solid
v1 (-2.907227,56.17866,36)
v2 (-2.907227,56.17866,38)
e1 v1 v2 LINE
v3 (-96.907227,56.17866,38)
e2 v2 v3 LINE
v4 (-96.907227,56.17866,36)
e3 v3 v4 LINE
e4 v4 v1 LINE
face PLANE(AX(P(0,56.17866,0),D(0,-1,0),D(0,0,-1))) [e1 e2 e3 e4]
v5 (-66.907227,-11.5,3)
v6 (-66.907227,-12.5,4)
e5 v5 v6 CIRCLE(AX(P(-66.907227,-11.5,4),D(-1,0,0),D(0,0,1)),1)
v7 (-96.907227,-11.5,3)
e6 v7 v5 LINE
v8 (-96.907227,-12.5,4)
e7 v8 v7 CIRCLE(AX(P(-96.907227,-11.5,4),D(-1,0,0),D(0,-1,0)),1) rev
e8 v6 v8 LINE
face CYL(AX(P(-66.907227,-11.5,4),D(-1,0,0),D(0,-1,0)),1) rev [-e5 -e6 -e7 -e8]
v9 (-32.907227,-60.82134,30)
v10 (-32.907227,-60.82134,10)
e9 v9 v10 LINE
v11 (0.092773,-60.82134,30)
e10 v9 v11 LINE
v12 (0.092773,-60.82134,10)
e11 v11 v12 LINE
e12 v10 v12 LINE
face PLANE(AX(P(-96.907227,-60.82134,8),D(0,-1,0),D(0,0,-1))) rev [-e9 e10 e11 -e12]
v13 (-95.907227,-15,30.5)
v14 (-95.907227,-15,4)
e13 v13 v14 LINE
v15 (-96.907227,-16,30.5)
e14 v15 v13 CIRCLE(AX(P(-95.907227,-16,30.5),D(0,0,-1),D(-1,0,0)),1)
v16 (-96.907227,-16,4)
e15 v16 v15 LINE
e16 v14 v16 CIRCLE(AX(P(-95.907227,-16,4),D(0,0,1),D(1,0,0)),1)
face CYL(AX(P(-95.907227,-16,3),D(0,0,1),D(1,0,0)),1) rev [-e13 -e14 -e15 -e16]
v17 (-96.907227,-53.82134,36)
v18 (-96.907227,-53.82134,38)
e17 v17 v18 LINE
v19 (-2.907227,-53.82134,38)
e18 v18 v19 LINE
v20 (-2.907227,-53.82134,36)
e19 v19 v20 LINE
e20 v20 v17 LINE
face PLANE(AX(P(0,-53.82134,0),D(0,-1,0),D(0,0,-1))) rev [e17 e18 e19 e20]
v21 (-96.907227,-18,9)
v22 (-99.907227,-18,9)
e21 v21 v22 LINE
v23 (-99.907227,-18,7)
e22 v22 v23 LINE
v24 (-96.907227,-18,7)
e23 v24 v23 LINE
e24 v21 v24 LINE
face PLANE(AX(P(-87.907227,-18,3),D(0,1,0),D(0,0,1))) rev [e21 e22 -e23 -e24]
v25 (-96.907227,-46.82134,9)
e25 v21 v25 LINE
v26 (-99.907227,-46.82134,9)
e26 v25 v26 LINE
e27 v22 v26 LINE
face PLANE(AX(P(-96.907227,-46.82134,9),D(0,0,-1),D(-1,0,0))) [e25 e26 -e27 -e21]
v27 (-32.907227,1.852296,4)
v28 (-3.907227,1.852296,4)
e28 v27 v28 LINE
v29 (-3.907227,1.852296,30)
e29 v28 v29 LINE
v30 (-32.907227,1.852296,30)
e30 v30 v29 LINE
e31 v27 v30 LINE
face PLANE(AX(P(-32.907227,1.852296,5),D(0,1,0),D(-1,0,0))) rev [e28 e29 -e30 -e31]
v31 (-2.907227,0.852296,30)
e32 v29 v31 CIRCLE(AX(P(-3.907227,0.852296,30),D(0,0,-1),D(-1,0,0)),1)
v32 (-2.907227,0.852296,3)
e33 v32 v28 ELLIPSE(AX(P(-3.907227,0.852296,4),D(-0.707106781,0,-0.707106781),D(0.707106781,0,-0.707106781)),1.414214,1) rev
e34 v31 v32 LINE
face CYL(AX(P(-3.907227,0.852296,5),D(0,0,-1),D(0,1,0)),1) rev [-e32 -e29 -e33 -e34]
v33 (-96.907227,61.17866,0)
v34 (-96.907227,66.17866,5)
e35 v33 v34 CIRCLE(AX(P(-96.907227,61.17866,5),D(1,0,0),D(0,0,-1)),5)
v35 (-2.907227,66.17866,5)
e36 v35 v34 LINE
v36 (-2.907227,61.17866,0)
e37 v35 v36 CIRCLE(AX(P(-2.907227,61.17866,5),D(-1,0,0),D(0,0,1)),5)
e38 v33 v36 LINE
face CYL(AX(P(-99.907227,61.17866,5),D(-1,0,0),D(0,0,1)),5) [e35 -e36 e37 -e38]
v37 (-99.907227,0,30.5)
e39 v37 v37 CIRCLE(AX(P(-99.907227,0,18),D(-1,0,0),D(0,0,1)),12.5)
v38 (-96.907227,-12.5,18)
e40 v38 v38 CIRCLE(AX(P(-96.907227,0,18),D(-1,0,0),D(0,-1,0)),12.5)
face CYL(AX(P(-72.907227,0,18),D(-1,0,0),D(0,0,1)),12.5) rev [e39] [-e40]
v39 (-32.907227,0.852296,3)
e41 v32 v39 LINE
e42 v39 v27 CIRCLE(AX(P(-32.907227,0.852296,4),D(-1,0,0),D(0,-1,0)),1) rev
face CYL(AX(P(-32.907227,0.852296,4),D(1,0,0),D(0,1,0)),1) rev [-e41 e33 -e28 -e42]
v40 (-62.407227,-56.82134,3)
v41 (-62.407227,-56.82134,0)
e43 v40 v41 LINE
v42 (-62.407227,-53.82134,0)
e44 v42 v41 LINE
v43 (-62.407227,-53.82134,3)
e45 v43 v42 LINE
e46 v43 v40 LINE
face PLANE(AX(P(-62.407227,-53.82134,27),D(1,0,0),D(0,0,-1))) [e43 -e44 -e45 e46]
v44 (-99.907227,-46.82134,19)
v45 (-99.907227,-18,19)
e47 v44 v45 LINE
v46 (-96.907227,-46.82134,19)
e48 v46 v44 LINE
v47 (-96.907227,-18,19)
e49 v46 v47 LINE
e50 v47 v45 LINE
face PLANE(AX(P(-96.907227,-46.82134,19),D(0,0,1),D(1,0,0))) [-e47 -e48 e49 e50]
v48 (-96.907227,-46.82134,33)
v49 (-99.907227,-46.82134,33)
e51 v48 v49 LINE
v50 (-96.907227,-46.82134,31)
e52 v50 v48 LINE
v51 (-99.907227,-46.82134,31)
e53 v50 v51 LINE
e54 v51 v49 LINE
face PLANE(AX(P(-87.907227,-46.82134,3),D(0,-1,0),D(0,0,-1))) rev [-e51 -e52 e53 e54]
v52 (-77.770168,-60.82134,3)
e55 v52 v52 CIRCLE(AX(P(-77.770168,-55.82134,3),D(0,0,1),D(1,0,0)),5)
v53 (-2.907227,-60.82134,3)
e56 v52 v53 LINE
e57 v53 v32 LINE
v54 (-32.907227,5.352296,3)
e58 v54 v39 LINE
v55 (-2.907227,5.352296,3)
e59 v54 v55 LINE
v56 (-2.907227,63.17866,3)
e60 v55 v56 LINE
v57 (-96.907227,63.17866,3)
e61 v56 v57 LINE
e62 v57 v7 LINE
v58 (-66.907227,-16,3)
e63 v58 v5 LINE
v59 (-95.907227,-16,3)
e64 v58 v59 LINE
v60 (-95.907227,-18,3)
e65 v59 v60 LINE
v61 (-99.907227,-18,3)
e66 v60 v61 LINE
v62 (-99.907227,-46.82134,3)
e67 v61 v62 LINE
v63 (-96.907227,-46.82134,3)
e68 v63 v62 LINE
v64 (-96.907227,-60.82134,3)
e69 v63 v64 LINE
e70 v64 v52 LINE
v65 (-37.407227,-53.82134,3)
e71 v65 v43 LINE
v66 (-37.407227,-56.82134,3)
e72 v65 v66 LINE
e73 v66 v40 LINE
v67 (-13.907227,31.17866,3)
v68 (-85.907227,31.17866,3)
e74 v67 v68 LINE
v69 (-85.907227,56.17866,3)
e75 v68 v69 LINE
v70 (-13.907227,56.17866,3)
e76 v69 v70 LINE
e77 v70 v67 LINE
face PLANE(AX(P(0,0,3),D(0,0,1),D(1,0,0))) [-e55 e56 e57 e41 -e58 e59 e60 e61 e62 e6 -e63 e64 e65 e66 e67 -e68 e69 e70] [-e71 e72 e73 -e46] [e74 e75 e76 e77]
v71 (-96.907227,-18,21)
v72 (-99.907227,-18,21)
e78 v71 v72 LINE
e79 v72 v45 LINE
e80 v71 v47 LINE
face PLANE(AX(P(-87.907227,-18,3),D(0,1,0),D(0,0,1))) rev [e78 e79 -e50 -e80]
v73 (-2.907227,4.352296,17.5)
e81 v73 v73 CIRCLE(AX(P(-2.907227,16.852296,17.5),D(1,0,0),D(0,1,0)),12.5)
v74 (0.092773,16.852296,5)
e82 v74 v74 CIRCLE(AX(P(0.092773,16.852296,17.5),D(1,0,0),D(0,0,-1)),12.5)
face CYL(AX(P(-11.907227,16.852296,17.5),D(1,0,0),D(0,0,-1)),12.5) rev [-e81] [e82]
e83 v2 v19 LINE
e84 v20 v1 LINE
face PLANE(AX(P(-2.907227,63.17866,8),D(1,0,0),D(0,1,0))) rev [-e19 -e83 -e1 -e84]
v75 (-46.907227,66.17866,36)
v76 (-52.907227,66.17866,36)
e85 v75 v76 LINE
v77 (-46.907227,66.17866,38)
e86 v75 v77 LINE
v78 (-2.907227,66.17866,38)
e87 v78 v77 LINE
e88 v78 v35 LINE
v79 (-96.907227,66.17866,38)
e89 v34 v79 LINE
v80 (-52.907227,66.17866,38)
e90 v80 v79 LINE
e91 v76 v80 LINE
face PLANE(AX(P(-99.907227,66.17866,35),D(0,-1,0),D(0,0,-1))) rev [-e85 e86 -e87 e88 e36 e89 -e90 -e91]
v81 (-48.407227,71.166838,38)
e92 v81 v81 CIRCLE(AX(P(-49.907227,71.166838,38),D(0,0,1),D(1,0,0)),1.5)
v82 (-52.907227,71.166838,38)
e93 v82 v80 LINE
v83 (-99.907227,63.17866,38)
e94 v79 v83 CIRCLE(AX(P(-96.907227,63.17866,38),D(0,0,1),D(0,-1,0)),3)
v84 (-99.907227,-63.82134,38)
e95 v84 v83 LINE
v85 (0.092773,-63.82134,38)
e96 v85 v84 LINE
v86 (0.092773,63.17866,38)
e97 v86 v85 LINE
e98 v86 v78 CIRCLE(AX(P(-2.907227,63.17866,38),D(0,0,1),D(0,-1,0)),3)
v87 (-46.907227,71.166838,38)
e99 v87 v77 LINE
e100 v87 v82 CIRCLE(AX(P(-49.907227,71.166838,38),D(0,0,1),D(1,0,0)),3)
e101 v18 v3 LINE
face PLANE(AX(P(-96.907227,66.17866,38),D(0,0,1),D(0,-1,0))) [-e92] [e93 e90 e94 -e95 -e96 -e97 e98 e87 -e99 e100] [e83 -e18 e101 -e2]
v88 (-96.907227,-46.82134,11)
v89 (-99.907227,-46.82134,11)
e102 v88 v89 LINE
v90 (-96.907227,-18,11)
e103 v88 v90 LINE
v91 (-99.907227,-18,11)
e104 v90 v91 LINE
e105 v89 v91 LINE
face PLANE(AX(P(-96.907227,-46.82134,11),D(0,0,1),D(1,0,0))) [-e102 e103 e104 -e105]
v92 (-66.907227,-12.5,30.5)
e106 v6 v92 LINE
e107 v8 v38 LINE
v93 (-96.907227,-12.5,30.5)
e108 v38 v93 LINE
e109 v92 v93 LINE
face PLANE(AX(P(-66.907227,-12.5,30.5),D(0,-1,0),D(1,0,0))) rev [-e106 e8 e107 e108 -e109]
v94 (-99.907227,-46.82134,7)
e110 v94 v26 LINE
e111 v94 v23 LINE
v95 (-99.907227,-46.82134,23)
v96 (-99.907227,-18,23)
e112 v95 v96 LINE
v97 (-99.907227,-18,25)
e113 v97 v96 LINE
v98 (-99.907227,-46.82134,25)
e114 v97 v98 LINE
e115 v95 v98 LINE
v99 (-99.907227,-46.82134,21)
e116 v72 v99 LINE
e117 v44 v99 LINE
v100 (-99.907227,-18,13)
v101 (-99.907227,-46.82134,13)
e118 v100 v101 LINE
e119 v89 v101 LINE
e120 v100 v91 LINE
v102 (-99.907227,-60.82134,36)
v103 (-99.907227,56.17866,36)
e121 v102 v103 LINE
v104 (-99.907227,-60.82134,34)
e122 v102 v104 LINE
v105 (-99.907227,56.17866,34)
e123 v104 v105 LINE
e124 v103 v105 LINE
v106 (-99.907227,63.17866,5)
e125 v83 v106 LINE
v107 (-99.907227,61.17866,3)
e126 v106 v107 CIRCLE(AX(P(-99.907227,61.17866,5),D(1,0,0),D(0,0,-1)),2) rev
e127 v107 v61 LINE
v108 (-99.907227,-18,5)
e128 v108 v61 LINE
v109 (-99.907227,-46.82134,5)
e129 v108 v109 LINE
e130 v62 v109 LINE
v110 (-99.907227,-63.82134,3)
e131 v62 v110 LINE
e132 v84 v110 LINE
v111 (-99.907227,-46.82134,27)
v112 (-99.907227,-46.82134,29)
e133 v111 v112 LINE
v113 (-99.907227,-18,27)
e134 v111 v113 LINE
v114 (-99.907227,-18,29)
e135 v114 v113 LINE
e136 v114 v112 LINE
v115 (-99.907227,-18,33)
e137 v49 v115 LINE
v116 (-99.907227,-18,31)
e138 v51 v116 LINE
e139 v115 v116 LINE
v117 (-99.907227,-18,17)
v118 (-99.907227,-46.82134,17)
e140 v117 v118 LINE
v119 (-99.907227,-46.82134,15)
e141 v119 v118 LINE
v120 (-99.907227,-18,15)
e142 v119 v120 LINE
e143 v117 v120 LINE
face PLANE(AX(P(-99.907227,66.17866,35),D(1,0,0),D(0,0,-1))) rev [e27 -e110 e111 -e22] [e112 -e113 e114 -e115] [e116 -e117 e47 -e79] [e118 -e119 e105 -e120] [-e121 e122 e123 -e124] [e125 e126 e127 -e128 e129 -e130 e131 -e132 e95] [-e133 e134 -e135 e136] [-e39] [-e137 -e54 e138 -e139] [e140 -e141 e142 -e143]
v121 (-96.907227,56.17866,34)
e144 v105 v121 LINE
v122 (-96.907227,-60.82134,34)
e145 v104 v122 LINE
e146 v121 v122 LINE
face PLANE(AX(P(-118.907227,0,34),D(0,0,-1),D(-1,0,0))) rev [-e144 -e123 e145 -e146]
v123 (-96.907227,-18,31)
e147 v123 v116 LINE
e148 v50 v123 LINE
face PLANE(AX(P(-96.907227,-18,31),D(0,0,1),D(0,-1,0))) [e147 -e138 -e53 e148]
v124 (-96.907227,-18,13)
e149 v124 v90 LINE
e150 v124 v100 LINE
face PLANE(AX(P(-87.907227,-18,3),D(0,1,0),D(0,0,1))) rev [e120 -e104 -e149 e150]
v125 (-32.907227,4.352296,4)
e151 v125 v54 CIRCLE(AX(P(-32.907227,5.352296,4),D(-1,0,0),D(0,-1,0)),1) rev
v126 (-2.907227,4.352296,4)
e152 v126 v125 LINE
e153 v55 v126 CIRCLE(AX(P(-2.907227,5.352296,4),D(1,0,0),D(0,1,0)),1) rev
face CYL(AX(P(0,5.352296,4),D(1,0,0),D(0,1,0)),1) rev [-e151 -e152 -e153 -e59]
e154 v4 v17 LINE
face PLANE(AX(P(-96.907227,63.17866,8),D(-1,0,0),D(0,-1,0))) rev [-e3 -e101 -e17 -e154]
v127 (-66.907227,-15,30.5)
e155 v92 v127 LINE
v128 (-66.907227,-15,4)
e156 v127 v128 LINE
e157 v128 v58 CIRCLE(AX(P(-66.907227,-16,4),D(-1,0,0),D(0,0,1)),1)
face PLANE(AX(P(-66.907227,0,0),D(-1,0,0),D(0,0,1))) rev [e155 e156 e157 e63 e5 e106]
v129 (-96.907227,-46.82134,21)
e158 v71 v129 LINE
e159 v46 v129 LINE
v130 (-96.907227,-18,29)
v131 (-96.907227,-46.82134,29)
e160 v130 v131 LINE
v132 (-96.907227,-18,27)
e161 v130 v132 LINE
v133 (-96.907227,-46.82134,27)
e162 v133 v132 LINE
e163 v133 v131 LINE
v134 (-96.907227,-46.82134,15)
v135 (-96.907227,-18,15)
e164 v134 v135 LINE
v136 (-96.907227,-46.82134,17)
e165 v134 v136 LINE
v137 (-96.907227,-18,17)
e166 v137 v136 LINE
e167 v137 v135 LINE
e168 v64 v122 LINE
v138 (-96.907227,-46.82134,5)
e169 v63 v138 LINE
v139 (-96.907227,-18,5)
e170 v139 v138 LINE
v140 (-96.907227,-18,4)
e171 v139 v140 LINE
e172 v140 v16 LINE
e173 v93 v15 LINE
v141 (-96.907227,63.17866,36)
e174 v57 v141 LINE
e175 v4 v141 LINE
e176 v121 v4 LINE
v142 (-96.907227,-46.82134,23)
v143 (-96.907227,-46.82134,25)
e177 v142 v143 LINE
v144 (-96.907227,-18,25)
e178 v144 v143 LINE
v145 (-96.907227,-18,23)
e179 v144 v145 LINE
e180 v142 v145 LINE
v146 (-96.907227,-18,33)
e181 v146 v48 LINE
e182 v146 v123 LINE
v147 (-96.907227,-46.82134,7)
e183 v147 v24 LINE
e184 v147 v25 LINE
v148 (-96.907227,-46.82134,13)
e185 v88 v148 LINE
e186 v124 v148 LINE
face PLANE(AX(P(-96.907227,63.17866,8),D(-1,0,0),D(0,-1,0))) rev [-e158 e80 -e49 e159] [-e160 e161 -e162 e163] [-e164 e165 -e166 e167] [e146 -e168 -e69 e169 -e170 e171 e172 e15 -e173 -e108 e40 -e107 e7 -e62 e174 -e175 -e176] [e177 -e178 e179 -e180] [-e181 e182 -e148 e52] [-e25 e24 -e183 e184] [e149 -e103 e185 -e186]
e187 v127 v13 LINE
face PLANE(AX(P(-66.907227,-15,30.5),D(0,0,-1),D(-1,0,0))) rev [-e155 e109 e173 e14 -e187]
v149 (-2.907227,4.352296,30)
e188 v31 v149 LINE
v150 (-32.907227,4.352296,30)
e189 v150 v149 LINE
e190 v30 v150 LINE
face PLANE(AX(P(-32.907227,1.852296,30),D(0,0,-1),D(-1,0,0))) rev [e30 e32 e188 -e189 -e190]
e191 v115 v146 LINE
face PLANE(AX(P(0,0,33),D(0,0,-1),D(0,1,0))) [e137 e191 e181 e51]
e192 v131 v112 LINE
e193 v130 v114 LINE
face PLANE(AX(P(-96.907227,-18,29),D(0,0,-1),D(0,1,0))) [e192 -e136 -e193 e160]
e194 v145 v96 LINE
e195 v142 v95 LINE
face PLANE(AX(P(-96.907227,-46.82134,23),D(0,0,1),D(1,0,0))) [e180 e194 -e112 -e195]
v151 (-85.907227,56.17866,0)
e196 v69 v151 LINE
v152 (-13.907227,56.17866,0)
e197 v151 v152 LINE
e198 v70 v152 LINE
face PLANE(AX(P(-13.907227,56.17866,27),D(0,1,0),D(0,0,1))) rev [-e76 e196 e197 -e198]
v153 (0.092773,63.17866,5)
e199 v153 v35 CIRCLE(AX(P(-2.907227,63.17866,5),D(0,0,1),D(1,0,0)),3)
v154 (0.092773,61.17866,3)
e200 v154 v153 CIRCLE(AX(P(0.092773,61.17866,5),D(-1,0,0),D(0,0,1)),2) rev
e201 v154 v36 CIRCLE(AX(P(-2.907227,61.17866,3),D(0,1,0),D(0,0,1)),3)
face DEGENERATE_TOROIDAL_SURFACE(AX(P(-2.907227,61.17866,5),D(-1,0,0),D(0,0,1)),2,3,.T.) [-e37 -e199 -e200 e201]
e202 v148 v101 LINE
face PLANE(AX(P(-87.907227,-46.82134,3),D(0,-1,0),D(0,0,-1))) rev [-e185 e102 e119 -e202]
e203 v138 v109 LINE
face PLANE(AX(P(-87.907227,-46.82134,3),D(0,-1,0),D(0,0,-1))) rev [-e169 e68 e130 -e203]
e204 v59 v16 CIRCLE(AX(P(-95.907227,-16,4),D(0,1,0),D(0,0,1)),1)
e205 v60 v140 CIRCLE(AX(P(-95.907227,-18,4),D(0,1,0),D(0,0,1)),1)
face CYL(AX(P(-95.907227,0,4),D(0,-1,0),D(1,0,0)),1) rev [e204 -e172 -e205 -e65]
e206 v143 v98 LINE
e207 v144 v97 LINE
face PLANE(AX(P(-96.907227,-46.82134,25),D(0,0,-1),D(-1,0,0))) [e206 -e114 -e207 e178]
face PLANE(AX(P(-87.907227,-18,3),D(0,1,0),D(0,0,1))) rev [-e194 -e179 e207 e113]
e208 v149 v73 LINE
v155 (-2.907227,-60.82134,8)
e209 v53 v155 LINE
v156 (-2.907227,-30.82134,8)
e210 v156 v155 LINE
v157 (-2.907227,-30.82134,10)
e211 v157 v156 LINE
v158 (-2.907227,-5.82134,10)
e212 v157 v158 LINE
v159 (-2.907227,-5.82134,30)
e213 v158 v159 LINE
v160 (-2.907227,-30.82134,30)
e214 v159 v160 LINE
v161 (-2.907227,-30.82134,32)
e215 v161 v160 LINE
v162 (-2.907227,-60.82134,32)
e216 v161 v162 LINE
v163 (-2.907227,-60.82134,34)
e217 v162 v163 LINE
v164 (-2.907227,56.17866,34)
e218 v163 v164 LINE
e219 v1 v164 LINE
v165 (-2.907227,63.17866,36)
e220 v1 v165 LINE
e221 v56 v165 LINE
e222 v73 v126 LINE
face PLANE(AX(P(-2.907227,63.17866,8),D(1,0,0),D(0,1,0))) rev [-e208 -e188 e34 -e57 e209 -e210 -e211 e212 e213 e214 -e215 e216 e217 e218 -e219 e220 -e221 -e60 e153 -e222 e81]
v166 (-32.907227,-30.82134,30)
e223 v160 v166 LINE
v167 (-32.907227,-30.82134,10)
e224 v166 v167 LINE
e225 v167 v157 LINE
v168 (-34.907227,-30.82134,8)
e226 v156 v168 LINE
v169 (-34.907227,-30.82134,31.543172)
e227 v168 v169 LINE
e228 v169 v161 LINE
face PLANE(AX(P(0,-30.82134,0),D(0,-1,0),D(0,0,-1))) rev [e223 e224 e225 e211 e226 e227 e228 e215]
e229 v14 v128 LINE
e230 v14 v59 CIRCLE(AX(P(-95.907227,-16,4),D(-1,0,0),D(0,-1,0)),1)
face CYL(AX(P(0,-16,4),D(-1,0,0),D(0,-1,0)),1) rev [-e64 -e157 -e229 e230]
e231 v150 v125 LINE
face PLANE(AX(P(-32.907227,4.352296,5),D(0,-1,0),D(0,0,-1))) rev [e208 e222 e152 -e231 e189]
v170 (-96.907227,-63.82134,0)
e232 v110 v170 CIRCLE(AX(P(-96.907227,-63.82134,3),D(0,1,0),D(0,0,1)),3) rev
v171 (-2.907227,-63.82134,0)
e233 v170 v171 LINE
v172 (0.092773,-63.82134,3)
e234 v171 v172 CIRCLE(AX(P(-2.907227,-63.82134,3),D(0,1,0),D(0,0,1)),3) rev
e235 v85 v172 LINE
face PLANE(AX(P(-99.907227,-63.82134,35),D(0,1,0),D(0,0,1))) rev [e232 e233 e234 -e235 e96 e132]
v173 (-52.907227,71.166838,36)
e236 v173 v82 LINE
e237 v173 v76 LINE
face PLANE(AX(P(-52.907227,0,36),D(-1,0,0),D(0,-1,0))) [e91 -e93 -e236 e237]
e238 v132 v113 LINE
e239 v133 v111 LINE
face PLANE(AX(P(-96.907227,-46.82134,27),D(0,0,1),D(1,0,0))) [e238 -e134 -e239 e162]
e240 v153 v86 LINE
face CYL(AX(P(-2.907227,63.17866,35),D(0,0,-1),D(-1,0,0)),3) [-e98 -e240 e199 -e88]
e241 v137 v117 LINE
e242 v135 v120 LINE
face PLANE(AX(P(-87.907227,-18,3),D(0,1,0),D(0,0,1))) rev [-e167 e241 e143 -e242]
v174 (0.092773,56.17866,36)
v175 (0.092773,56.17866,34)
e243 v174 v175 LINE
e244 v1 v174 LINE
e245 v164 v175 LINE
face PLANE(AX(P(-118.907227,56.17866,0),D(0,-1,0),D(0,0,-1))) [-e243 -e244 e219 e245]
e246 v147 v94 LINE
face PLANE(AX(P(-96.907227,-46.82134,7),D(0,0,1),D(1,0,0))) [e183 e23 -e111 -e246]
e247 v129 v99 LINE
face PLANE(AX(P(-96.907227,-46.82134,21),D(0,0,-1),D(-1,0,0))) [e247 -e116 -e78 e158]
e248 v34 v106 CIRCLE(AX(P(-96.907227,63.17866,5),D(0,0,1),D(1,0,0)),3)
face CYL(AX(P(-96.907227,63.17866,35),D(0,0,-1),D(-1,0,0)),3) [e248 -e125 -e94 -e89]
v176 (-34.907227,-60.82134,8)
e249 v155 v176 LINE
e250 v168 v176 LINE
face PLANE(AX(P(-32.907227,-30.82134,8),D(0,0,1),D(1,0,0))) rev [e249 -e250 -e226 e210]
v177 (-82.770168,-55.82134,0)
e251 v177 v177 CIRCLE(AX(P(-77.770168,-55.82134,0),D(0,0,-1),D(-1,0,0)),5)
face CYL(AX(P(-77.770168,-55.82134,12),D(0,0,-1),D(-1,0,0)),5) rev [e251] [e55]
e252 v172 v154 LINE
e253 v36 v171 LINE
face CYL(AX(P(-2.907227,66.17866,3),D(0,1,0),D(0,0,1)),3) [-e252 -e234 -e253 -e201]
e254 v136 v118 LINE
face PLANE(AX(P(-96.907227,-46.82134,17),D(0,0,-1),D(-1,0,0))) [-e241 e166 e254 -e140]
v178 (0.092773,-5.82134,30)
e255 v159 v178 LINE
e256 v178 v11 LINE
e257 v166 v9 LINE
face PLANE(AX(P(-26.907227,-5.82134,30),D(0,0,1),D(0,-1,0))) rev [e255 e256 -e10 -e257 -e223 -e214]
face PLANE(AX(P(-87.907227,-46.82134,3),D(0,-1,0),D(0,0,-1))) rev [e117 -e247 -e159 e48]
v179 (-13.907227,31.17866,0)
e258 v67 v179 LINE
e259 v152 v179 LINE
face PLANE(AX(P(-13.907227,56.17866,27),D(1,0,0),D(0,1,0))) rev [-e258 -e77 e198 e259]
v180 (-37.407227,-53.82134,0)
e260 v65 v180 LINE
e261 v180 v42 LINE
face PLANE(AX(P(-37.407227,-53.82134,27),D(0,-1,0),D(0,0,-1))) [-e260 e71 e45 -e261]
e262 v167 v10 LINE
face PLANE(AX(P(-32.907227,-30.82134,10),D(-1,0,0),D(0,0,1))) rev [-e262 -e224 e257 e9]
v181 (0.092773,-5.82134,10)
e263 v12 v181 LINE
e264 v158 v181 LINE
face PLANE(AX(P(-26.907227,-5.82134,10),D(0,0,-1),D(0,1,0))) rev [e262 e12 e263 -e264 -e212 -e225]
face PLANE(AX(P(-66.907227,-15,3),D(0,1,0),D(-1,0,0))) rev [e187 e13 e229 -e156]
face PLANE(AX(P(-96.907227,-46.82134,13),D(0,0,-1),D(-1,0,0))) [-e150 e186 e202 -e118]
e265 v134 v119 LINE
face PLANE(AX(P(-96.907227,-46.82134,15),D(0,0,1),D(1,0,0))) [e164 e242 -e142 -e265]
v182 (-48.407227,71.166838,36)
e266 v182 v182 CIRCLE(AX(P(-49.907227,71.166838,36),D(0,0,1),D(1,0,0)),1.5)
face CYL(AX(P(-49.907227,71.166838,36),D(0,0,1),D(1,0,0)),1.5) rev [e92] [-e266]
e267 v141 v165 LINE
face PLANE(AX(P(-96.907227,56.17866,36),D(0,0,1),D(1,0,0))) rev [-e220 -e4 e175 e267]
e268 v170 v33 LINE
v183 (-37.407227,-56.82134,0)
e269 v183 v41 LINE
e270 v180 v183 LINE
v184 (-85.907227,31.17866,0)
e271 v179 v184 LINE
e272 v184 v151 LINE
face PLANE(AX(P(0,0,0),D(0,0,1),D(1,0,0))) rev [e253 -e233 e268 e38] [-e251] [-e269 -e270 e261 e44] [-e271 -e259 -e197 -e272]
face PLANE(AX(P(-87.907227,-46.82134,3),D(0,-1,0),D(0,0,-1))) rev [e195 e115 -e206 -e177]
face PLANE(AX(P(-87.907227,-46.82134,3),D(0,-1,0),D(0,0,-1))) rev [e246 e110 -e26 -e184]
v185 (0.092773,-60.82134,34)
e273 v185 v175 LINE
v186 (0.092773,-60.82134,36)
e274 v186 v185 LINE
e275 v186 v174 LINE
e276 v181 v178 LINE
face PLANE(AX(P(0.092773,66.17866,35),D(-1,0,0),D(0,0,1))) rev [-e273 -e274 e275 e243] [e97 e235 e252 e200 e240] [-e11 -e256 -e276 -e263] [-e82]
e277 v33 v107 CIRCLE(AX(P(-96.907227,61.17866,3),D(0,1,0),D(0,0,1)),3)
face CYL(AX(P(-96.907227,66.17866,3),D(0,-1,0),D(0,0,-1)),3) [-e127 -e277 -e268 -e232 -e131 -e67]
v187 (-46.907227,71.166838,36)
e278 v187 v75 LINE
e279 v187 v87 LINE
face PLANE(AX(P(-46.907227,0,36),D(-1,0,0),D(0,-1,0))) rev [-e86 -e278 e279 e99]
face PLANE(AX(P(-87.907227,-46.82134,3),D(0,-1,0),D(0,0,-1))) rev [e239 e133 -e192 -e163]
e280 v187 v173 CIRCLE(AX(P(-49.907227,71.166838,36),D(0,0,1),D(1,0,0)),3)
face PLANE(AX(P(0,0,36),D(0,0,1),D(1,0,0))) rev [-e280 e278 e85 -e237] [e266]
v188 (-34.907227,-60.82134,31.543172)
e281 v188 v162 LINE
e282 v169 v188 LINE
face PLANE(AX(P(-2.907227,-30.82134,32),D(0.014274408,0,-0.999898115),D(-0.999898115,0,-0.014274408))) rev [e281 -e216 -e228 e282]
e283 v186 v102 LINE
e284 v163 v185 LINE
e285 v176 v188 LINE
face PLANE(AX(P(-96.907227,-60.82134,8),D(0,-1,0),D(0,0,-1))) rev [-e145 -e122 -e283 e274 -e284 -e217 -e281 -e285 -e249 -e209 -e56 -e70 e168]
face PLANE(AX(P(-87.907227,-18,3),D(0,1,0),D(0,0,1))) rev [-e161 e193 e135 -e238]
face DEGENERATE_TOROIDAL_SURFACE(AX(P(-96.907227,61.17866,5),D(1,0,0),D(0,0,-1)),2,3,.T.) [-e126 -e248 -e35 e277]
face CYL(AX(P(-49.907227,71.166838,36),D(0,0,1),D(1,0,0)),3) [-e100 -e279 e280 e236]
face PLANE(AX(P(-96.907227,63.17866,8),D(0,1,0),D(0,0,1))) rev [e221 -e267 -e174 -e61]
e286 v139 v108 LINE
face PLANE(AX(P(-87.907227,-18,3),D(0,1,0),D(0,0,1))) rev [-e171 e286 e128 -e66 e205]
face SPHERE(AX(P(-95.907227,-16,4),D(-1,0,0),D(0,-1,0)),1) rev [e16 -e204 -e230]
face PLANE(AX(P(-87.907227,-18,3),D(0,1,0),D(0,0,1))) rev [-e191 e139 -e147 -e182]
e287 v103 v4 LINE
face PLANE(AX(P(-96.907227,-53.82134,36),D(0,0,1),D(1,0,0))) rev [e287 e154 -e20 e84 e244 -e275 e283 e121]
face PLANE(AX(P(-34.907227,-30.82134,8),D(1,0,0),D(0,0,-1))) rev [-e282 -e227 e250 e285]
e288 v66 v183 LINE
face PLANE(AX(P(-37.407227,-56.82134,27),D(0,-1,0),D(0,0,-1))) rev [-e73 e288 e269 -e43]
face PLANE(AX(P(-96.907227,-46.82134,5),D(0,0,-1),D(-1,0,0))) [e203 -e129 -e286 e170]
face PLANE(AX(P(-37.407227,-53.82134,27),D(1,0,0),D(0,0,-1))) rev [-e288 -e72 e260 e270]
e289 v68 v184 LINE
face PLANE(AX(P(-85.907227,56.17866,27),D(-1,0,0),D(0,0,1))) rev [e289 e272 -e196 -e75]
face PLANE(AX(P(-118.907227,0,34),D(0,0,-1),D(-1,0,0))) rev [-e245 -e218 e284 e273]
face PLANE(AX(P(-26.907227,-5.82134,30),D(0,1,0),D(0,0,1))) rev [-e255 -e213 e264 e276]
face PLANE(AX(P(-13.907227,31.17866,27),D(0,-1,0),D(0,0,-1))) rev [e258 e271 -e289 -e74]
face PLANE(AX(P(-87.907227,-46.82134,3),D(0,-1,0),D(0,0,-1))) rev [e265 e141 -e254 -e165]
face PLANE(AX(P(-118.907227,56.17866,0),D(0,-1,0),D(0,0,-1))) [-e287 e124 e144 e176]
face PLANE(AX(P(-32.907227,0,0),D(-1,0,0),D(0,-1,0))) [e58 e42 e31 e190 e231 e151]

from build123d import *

# Parameters (mm, degrees)
IZIM1_W                      = 100
IZIM1_H                      = 130
Y_KSEKLIK_EKSTR_ZYON1_DEPTH  = 35
IZIM2_W                      = 94
IZIM2_H                      = 124
KES_EKSTR_ZYON1_DEPTH        = 27
IZIM3_W                      = 72
IZIM3_H                      = 25
KES_EKSTR_ZYON2_DEPTH        = 27
IZIM4_W                      = 25
IZIM4_H                      = 3
KES_EKSTR_ZYON3_DEPTH        = 27
IZIM7_W                      = 20
IZIM7_H                      = 55
KES_EKSTR_ZYON5_DEPTH        = 27
IZIM8_R                      = 12.5
KES_EKSTR_ZYON7_DEPTH        = 27
IZIM9_R                      = 12.5
KES_EKSTR_ZYON8_DEPTH        = 27
IZIM12_W                     = 94
IZIM12_H                     = 124
KES_EKSTR_ZYON9_DEPTH        = 5
IZIM13_W                     = 28.453191741
IZIM13_H                     = 38.236186197
Y_KSEKLIK_EKSTR_ZYON2_DEPTH  = 3
IZIM14_R                     = 12.5
KES_EKSTR_ZYON10_DEPTH       = 12
IZIM15_R                     = 5
KES_EKSTR_ZYON12_DEPTH       = 12
IZIM16_W                     = 29
IZIM16_H                     = 28.82133995
KES_EKSTR_ZYON13_DEPTH       = 12
IZIM17_W                     = 2
IZIM17_H                     = 28.82133995
Y_KSEKLIK_EKSTR_ZYON3_DEPTH  = 3
IZIM18_W                     = 3
IZIM18_H                     = 28.82133995
KES_EKSTR_ZYON14_DEPTH       = 1
IZIM20_W                     = 3
IZIM20_H                     = 130
Y_KSEKLIK_EKSTR_ZYON4_DEPTH  = 3
IZIM21_W                     = 3
IZIM21_H                     = 130
Y_KSEKLIK_EKSTR_ZYON5_DEPTH  = 3
IZIM22_W                     = 94
IZIM22_H                     = 3
Y_KSEKLIK_EKSTR_ZYON6_DEPTH  = 3
IZIM23_W                     = 94
IZIM23_H                     = 3
Y_KSEKLIK_EKSTR_ZYON8_DEPTH  = 3
IZIM24_W                     = 94
IZIM24_H                     = 2
Y_KSEKLIK_EKSTR_ZYON9_DEPTH  = 7
IZIM25_W                     = 94
IZIM25_H                     = 2
Y_KSEKLIK_EKSTR_ZYON10_DEPTH = 7
IZIM28_W                     = 2
IZIM28_H                     = 117
KES_EKSTR_ZYON16_DEPTH       = 119
Y_KSEKLIK_EKSTR_ZYON13_DEPTH = 2
Y_KSEKLIK_EKSTR_ZYON14_DEPTH = 30
Y_KSEKLIK_EKSTR_ZYON16_DEPTH = 30
IZIM33_W                     = 27.5
IZIM33_H                     = 2.5
Y_KSEKLIK_EKSTR_ZYON17_DEPTH = 30
RADYUS2_R                    = 1
RADYUS3_R                    = 1
RADYUS4_R                    = 5
RADYUS5_R                    = 3
RADYUS6_R                    = 3
RADYUS7_R                    = 1
RADYUS8_R                    = 1
RADYUS9_R                    = 1
RADYUS12_R                   = 1


# Some blends are built 0.0001 mm under size
with BuildPart() as part:
    # Çizim1 → Yükseklik-Ekstrüzyon1 (new body)
    with BuildSketch(Plane.XY):
        with Locations((-49.907227327, 1.17866005)):
            Rectangle(IZIM1_W, IZIM1_H)
    extrude(amount=Y_KSEKLIK_EKSTR_ZYON1_DEPTH)

    # Çizim2 → Kes-Ekstrüzyon1 (cut)
    with BuildSketch(Plane.XY.offset(35)):
        with Locations((-49.907227327, 1.17866005)):
            Rectangle(IZIM2_W, IZIM2_H)
    extrude(amount=-KES_EKSTR_ZYON1_DEPTH, mode=Mode.SUBTRACT)

    # Çizim3 → Kes-Ekstrüzyon2 (cut)
    with BuildSketch(Plane(origin=(0, 0, 0), x_dir=(-1, 0, 0), z_dir=(0, 0, -1))):
        with Locations((49.907227327, 43.67866005)):
            Rectangle(IZIM3_W, IZIM3_H)
    extrude(amount=-KES_EKSTR_ZYON2_DEPTH, mode=Mode.SUBTRACT)

    # Çizim4 → Kes-Ekstrüzyon3 (cut)
    with BuildSketch(Plane(origin=(0, 0, 0), x_dir=(-1, 0, 0), z_dir=(0, 0, -1))):
        with Locations((49.907227327, -55.32133995)):
            Rectangle(IZIM4_W, IZIM4_H)
    extrude(amount=-KES_EKSTR_ZYON3_DEPTH, mode=Mode.SUBTRACT)

    # Çizim7 → Kes-Ekstrüzyon5 (cut)
    with BuildSketch(Plane(origin=(0.092772673, 0, 0), x_dir=(0, 0, -1), z_dir=(1, 0, 0))):
        with Locations((-20, -33.32133995)):
            Rectangle(IZIM7_W, IZIM7_H)
    extrude(amount=-KES_EKSTR_ZYON5_DEPTH, mode=Mode.SUBTRACT)

    # Çizim8 → Kes-Ekstrüzyon7 (cut)
    with BuildSketch(Plane.ZY.offset(99.907227327)):
        with Locations((18, 0)):
            Circle(IZIM8_R)
    extrude(amount=-KES_EKSTR_ZYON7_DEPTH, mode=Mode.SUBTRACT)

    # Çizim9 → Kes-Ekstrüzyon8 (cut)
    with BuildSketch(Plane(origin=(0.092772673, 0, 0), x_dir=(0, 0, -1), z_dir=(1, 0, 0))):
        with Locations((-21.5, 19.418739017)):
            Circle(IZIM9_R)
    extrude(amount=-KES_EKSTR_ZYON8_DEPTH, mode=Mode.SUBTRACT)

    # Çizim12 → Kes-Ekstrüzyon9 (cut)
    with BuildSketch(Plane.XY.offset(8)):
        with Locations((-49.907227327, 1.17866005)):
            Rectangle(IZIM12_W, IZIM12_H)
    extrude(amount=-KES_EKSTR_ZYON9_DEPTH, mode=Mode.SUBTRACT)

    # Çizim13 → Yükseklik-Ekstrüzyon2 (add)
    with BuildSketch(Plane(origin=(0.092772673, 0, 0), x_dir=(0, 0, -1), z_dir=(1, 0, 0))):
        with Locations((-20.77340413, 20.296753148)):
            Rectangle(IZIM13_W, IZIM13_H)
    extrude(amount=-Y_KSEKLIK_EKSTR_ZYON2_DEPTH)

    # Çizim14 → Kes-Ekstrüzyon10 (cut)
    with BuildSketch(Plane(origin=(0.092772673, 0, 0), x_dir=(0, 0, -1), z_dir=(1, 0, 0))):
        with Locations((-17.5, 16.852295745)):
            Circle(IZIM14_R)
    extrude(amount=-KES_EKSTR_ZYON10_DEPTH, mode=Mode.SUBTRACT)

    # Çizim15 → Kes-Ekstrüzyon12 (cut)
    with BuildSketch(Plane(origin=(0, 0, 0), x_dir=(-1, 0, 0), z_dir=(0, 0, -1))):
        with Locations((77.770167632, -55.82133995)):
            Circle(IZIM15_R)
    extrude(amount=-KES_EKSTR_ZYON12_DEPTH, mode=Mode.SUBTRACT)

    # Çizim16 → Kes-Ekstrüzyon13 (cut)
    with BuildSketch(Plane.ZY.offset(99.907227327)):
        with Locations((17.5, -32.410669975)):
            Rectangle(IZIM16_W, IZIM16_H)
    extrude(amount=-KES_EKSTR_ZYON13_DEPTH, mode=Mode.SUBTRACT)

    # Çizim17 → Yükseklik-Ekstrüzyon3 (add)
    with BuildSketch(Plane.ZY.offset(99.907227327)):
        with Locations((6, -32.410669975)):
            Rectangle(IZIM17_W, IZIM17_H)
        with Locations((10, -32.410669975)):
            Rectangle(IZIM17_W, IZIM17_H)
        with Locations((14, -32.410669975)):
            Rectangle(IZIM17_W, IZIM17_H)
        with Locations((18, -32.410669975)):
            Rectangle(IZIM17_W, IZIM17_H)
        with Locations((22, -32.410669975)):
            Rectangle(IZIM17_W, IZIM17_H)
        with Locations((26, -32.410669975)):
            Rectangle(IZIM17_W, IZIM17_H)
        with Locations((30, -32.410669975)):
            Rectangle(IZIM17_W, IZIM17_H)
    extrude(amount=-Y_KSEKLIK_EKSTR_ZYON3_DEPTH)

    # Çizim18 → Kes-Ekstrüzyon14 (cut)
    with BuildSketch(Plane(origin=(0, 0, 32), x_dir=(-1, 0, 0), z_dir=(0, 0, -1))):
        with Locations((98.407227327, -32.410669975)):
            Rectangle(IZIM18_W, IZIM18_H)
    extrude(amount=-KES_EKSTR_ZYON14_DEPTH, mode=Mode.SUBTRACT)

    # Çizim20 → Yükseklik-Ekstrüzyon4 (add)
    with BuildSketch(Plane.ZY.offset(99.907227327)):
        with Locations((36.5, 1.17866005)):
            Rectangle(IZIM20_W, IZIM20_H)
    extrude(amount=-Y_KSEKLIK_EKSTR_ZYON4_DEPTH)

    # Çizim21 → Yükseklik-Ekstrüzyon5 (add)
    with BuildSketch(Plane(origin=(0.092772673, 0, 0), x_dir=(0, 0, -1), z_dir=(1, 0, 0))):
        with Locations((-36.5, 1.17866005)):
            Rectangle(IZIM21_W, IZIM21_H)
    extrude(amount=-Y_KSEKLIK_EKSTR_ZYON5_DEPTH)

    # Çizim22 → Yükseklik-Ekstrüzyon6 (add)
    with BuildSketch(Plane(origin=(0, 66.17866005, 0), x_dir=(1, 0, 0), z_dir=(0, 1, 0))):
        with Locations((-49.907227327, -36.5)):
            Rectangle(IZIM22_W, IZIM22_H)
    extrude(amount=-Y_KSEKLIK_EKSTR_ZYON6_DEPTH)

    # Çizim23 → Yükseklik-Ekstrüzyon8 (add)
    with BuildSketch(Plane(origin=(0, -60.82133995, 0), x_dir=(1, 0, 0), z_dir=(0, 1, 0))):
        with Locations((-49.907227327, -36.5)):
            Rectangle(IZIM23_W, IZIM23_H)
    extrude(amount=-Y_KSEKLIK_EKSTR_ZYON8_DEPTH)

    # Çizim24 → Yükseklik-Ekstrüzyon9 (add)
    with BuildSketch(Plane.XZ.offset(-63.17866005)):
        with Locations((-49.907227327, 37)):
            Rectangle(IZIM24_W, IZIM24_H)
    extrude(amount=Y_KSEKLIK_EKSTR_ZYON9_DEPTH)

    # Çizim25 → Yükseklik-Ekstrüzyon10 (add)
    with BuildSketch(Plane(origin=(0, -60.82133995, 0), x_dir=(1, 0, 0), z_dir=(0, 1, 0))):
        with Locations((-49.907227327, -37)):
            Rectangle(IZIM25_W, IZIM25_H)
    extrude(amount=Y_KSEKLIK_EKSTR_ZYON10_DEPTH)

    # Çizim28 → Kes-Ekstrüzyon16 (cut)
    with BuildSketch(Plane(origin=(0.092772673, 0, 0), x_dir=(0, 0, -1), z_dir=(1, 0, 0))):
        with Locations((-35, -2.32133995)):
            Rectangle(IZIM28_W, IZIM28_H)
    extrude(amount=-KES_EKSTR_ZYON16_DEPTH, mode=Mode.SUBTRACT)

    # Çizim30 → Yükseklik-Ekstrüzyon13 (add)
    with BuildSketch(Plane.XY.offset(38)):
        with BuildLine():
            Line((-52.907227327, 66.17866005), (-49.907227327, 66.17866005))
            Line((-49.907227327, 66.17866005), (-49.907227327, 68.166838309))
            ThreePointArc((-49.907227327, 68.166838309), (-52.02854767, 69.045517966), (-52.907227327, 71.166838309))
            Line((-52.907227327, 71.166838309), (-52.907227327, 66.17866005))
        make_face()
        with BuildLine():
            Line((-49.907227327, 68.166838309), (-49.907227327, 66.17866005))
            Line((-49.907227327, 66.17866005), (-46.907227327, 66.17866005))
            Line((-46.907227327, 66.17866005), (-46.907227327, 71.166838309))
            ThreePointArc((-46.907227327, 71.166838309), (-47.785906983, 69.045517966), (-49.907227327, 68.166838309))
        make_face()
        with BuildLine():
            ThreePointArc((-52.907227327, 71.166838309), (-52.02854767, 69.045517966), (-49.907227327, 68.166838309))
            Line((-49.907227327, 68.166838309), (-49.907227327, 69.666838309))
            ThreePointArc((-49.907227327, 69.666838309), (-51.407227327, 71.166838309), (-49.907227327, 72.666838309))
            Line((-49.907227327, 72.666838309), (-49.907227327, 74.166838309))
            ThreePointArc((-49.907227327, 74.166838309), (-52.02854767, 73.288158653), (-52.907227327, 71.166838309))
        make_face()
        with BuildLine():
            Line((-49.907227327, 69.666838309), (-49.907227327, 68.166838309))
            ThreePointArc((-49.907227327, 68.166838309), (-47.785906983, 69.045517966), (-46.907227327, 71.166838309))
            ThreePointArc((-46.907227327, 71.166838309), (-47.785906983, 73.288158653), (-49.907227327, 74.166838309))
            Line((-49.907227327, 74.166838309), (-49.907227327, 72.666838309))
            ThreePointArc((-49.907227327, 72.666838309), (-48.846567155, 72.227498481), (-48.407227327, 71.166838309))
            ThreePointArc((-48.407227327, 71.166838309), (-48.846567155, 70.106178138), (-49.907227327, 69.666838309))
        make_face()
    extrude(amount=-Y_KSEKLIK_EKSTR_ZYON13_DEPTH)

    # Çizim31 → Yükseklik-Ekstrüzyon14 (add)
    with BuildSketch(Plane(origin=(0, -60.82133995, 0), x_dir=(1, 0, 0), z_dir=(0, 1, 0))):
        Polygon((-32.907227327, -10), (-32.907227327, -30), (-2.907227327, -30), (-2.907227327, -32), (-34.907227327, -31.543172405), (-34.907227327, -8), (-32.907227327, -8), (-2.907227327, -8), (-2.907227327, -10), align=None)
    extrude(amount=Y_KSEKLIK_EKSTR_ZYON14_DEPTH)

    # Çizim32 → Yükseklik-Ekstrüzyon16 (add)
    with BuildSketch(Plane.ZY.offset(2.907227327)):
        Polygon((30, 4.352295745), (5, 4.352295745), (3, 4.352295745), (3, 1.852295745), (5, 1.852295745), (30, 1.852295745), align=None)
    extrude(amount=Y_KSEKLIK_EKSTR_ZYON16_DEPTH)

    # Çizim33 → Yükseklik-Ekstrüzyon17 (add)
    with BuildSketch(Plane(origin=(-96.907227327, 0, 0), x_dir=(0, 0, -1), z_dir=(1, 0, 0))):
        with Locations((-16.75, -13.75)):
            Rectangle(IZIM33_W, IZIM33_H)
    extrude(amount=Y_KSEKLIK_EKSTR_ZYON17_DEPTH)

    # Radyus2
    radyus2_edges = [part.edges().sort_by_distance(p)[0] for p in [
        (-81.907227327, -12.5, 3),
    ]]
    fillet(radyus2_edges, radius=RADYUS2_R)

    # Radyus3
    radyus3_edges = [part.edges().sort_by_distance(p)[0] for p in [
        (-17.907227327, 4.352295745, 3),
    ]]
    fillet(radyus3_edges, radius=RADYUS3_R)

    # Radyus4
    radyus4_edges = [part.edges().sort_by_distance(p)[0] for p in [
        (-49.907227327, 66.17866005, 0),
    ]]
    fillet(radyus4_edges, radius=RADYUS4_R)

    # Radyus5
    radyus5_edges = [part.edges().sort_by_distance(p)[0] for p in [
        (0.092772673, -1.32133995, 0),
        (0.092772673, 64.714193956, 1.464466094),
        (0.092772673, 66.17866005, 21.5),
    ]]
    fillet(radyus5_edges, radius=RADYUS5_R)

    # Radyus6
    radyus6_edges = [part.edges().sort_by_distance(p)[0] for p in [
        (-99.907227327, -1.32133995, 0),
        (-99.907227327, 64.714193956, 1.464466094),
        (-99.907227327, 66.17866005, 21.5),
    ]]
    fillet(radyus6_edges, radius=RADYUS6_R - 0.0001)  # a hair under: the kernel refuses the full size

    # Radyus7
    radyus7_edges = [part.edges().sort_by_distance(p)[0] for p in [
        (-17.907227327, 1.852295745, 3),
    ]]
    fillet(radyus7_edges, radius=RADYUS7_R)

    # Radyus8
    radyus8_edges = [part.edges().sort_by_distance(p)[0] for p in [
        (-81.907227327, -15, 3),
    ]]
    fillet(radyus8_edges, radius=RADYUS8_R)

    # Radyus9
    radyus9_edges = [part.edges().sort_by_distance(p)[0] for p in [
        (-96.907227327, -15, 17.25),
        (-96.907227327, -17, 3),
        (-96.907227327, -15.292893219, 3.292893219),
    ]]
    fillet(radyus9_edges, radius=RADYUS9_R)

    # Radyus12
    # the kernel refuses this fillet: 1 mm, written as the material it adds along each edge
    with BuildSketch(Plane(origin=(-2.907227327, 1.852295745, 1.5), x_dir=(-1, 0, 0), z_dir=(0, 0, 1))) as radyus12_piece_1:
        with BuildLine():
            CenterArc((RADYUS12_R, RADYUS12_R), RADYUS12_R, 180, 90)
            Line((0, RADYUS12_R), (0, 0))
            Line((0, 0), (RADYUS12_R, 0))
        make_face()
    extrude(amount=28.5)


solid = part.part
